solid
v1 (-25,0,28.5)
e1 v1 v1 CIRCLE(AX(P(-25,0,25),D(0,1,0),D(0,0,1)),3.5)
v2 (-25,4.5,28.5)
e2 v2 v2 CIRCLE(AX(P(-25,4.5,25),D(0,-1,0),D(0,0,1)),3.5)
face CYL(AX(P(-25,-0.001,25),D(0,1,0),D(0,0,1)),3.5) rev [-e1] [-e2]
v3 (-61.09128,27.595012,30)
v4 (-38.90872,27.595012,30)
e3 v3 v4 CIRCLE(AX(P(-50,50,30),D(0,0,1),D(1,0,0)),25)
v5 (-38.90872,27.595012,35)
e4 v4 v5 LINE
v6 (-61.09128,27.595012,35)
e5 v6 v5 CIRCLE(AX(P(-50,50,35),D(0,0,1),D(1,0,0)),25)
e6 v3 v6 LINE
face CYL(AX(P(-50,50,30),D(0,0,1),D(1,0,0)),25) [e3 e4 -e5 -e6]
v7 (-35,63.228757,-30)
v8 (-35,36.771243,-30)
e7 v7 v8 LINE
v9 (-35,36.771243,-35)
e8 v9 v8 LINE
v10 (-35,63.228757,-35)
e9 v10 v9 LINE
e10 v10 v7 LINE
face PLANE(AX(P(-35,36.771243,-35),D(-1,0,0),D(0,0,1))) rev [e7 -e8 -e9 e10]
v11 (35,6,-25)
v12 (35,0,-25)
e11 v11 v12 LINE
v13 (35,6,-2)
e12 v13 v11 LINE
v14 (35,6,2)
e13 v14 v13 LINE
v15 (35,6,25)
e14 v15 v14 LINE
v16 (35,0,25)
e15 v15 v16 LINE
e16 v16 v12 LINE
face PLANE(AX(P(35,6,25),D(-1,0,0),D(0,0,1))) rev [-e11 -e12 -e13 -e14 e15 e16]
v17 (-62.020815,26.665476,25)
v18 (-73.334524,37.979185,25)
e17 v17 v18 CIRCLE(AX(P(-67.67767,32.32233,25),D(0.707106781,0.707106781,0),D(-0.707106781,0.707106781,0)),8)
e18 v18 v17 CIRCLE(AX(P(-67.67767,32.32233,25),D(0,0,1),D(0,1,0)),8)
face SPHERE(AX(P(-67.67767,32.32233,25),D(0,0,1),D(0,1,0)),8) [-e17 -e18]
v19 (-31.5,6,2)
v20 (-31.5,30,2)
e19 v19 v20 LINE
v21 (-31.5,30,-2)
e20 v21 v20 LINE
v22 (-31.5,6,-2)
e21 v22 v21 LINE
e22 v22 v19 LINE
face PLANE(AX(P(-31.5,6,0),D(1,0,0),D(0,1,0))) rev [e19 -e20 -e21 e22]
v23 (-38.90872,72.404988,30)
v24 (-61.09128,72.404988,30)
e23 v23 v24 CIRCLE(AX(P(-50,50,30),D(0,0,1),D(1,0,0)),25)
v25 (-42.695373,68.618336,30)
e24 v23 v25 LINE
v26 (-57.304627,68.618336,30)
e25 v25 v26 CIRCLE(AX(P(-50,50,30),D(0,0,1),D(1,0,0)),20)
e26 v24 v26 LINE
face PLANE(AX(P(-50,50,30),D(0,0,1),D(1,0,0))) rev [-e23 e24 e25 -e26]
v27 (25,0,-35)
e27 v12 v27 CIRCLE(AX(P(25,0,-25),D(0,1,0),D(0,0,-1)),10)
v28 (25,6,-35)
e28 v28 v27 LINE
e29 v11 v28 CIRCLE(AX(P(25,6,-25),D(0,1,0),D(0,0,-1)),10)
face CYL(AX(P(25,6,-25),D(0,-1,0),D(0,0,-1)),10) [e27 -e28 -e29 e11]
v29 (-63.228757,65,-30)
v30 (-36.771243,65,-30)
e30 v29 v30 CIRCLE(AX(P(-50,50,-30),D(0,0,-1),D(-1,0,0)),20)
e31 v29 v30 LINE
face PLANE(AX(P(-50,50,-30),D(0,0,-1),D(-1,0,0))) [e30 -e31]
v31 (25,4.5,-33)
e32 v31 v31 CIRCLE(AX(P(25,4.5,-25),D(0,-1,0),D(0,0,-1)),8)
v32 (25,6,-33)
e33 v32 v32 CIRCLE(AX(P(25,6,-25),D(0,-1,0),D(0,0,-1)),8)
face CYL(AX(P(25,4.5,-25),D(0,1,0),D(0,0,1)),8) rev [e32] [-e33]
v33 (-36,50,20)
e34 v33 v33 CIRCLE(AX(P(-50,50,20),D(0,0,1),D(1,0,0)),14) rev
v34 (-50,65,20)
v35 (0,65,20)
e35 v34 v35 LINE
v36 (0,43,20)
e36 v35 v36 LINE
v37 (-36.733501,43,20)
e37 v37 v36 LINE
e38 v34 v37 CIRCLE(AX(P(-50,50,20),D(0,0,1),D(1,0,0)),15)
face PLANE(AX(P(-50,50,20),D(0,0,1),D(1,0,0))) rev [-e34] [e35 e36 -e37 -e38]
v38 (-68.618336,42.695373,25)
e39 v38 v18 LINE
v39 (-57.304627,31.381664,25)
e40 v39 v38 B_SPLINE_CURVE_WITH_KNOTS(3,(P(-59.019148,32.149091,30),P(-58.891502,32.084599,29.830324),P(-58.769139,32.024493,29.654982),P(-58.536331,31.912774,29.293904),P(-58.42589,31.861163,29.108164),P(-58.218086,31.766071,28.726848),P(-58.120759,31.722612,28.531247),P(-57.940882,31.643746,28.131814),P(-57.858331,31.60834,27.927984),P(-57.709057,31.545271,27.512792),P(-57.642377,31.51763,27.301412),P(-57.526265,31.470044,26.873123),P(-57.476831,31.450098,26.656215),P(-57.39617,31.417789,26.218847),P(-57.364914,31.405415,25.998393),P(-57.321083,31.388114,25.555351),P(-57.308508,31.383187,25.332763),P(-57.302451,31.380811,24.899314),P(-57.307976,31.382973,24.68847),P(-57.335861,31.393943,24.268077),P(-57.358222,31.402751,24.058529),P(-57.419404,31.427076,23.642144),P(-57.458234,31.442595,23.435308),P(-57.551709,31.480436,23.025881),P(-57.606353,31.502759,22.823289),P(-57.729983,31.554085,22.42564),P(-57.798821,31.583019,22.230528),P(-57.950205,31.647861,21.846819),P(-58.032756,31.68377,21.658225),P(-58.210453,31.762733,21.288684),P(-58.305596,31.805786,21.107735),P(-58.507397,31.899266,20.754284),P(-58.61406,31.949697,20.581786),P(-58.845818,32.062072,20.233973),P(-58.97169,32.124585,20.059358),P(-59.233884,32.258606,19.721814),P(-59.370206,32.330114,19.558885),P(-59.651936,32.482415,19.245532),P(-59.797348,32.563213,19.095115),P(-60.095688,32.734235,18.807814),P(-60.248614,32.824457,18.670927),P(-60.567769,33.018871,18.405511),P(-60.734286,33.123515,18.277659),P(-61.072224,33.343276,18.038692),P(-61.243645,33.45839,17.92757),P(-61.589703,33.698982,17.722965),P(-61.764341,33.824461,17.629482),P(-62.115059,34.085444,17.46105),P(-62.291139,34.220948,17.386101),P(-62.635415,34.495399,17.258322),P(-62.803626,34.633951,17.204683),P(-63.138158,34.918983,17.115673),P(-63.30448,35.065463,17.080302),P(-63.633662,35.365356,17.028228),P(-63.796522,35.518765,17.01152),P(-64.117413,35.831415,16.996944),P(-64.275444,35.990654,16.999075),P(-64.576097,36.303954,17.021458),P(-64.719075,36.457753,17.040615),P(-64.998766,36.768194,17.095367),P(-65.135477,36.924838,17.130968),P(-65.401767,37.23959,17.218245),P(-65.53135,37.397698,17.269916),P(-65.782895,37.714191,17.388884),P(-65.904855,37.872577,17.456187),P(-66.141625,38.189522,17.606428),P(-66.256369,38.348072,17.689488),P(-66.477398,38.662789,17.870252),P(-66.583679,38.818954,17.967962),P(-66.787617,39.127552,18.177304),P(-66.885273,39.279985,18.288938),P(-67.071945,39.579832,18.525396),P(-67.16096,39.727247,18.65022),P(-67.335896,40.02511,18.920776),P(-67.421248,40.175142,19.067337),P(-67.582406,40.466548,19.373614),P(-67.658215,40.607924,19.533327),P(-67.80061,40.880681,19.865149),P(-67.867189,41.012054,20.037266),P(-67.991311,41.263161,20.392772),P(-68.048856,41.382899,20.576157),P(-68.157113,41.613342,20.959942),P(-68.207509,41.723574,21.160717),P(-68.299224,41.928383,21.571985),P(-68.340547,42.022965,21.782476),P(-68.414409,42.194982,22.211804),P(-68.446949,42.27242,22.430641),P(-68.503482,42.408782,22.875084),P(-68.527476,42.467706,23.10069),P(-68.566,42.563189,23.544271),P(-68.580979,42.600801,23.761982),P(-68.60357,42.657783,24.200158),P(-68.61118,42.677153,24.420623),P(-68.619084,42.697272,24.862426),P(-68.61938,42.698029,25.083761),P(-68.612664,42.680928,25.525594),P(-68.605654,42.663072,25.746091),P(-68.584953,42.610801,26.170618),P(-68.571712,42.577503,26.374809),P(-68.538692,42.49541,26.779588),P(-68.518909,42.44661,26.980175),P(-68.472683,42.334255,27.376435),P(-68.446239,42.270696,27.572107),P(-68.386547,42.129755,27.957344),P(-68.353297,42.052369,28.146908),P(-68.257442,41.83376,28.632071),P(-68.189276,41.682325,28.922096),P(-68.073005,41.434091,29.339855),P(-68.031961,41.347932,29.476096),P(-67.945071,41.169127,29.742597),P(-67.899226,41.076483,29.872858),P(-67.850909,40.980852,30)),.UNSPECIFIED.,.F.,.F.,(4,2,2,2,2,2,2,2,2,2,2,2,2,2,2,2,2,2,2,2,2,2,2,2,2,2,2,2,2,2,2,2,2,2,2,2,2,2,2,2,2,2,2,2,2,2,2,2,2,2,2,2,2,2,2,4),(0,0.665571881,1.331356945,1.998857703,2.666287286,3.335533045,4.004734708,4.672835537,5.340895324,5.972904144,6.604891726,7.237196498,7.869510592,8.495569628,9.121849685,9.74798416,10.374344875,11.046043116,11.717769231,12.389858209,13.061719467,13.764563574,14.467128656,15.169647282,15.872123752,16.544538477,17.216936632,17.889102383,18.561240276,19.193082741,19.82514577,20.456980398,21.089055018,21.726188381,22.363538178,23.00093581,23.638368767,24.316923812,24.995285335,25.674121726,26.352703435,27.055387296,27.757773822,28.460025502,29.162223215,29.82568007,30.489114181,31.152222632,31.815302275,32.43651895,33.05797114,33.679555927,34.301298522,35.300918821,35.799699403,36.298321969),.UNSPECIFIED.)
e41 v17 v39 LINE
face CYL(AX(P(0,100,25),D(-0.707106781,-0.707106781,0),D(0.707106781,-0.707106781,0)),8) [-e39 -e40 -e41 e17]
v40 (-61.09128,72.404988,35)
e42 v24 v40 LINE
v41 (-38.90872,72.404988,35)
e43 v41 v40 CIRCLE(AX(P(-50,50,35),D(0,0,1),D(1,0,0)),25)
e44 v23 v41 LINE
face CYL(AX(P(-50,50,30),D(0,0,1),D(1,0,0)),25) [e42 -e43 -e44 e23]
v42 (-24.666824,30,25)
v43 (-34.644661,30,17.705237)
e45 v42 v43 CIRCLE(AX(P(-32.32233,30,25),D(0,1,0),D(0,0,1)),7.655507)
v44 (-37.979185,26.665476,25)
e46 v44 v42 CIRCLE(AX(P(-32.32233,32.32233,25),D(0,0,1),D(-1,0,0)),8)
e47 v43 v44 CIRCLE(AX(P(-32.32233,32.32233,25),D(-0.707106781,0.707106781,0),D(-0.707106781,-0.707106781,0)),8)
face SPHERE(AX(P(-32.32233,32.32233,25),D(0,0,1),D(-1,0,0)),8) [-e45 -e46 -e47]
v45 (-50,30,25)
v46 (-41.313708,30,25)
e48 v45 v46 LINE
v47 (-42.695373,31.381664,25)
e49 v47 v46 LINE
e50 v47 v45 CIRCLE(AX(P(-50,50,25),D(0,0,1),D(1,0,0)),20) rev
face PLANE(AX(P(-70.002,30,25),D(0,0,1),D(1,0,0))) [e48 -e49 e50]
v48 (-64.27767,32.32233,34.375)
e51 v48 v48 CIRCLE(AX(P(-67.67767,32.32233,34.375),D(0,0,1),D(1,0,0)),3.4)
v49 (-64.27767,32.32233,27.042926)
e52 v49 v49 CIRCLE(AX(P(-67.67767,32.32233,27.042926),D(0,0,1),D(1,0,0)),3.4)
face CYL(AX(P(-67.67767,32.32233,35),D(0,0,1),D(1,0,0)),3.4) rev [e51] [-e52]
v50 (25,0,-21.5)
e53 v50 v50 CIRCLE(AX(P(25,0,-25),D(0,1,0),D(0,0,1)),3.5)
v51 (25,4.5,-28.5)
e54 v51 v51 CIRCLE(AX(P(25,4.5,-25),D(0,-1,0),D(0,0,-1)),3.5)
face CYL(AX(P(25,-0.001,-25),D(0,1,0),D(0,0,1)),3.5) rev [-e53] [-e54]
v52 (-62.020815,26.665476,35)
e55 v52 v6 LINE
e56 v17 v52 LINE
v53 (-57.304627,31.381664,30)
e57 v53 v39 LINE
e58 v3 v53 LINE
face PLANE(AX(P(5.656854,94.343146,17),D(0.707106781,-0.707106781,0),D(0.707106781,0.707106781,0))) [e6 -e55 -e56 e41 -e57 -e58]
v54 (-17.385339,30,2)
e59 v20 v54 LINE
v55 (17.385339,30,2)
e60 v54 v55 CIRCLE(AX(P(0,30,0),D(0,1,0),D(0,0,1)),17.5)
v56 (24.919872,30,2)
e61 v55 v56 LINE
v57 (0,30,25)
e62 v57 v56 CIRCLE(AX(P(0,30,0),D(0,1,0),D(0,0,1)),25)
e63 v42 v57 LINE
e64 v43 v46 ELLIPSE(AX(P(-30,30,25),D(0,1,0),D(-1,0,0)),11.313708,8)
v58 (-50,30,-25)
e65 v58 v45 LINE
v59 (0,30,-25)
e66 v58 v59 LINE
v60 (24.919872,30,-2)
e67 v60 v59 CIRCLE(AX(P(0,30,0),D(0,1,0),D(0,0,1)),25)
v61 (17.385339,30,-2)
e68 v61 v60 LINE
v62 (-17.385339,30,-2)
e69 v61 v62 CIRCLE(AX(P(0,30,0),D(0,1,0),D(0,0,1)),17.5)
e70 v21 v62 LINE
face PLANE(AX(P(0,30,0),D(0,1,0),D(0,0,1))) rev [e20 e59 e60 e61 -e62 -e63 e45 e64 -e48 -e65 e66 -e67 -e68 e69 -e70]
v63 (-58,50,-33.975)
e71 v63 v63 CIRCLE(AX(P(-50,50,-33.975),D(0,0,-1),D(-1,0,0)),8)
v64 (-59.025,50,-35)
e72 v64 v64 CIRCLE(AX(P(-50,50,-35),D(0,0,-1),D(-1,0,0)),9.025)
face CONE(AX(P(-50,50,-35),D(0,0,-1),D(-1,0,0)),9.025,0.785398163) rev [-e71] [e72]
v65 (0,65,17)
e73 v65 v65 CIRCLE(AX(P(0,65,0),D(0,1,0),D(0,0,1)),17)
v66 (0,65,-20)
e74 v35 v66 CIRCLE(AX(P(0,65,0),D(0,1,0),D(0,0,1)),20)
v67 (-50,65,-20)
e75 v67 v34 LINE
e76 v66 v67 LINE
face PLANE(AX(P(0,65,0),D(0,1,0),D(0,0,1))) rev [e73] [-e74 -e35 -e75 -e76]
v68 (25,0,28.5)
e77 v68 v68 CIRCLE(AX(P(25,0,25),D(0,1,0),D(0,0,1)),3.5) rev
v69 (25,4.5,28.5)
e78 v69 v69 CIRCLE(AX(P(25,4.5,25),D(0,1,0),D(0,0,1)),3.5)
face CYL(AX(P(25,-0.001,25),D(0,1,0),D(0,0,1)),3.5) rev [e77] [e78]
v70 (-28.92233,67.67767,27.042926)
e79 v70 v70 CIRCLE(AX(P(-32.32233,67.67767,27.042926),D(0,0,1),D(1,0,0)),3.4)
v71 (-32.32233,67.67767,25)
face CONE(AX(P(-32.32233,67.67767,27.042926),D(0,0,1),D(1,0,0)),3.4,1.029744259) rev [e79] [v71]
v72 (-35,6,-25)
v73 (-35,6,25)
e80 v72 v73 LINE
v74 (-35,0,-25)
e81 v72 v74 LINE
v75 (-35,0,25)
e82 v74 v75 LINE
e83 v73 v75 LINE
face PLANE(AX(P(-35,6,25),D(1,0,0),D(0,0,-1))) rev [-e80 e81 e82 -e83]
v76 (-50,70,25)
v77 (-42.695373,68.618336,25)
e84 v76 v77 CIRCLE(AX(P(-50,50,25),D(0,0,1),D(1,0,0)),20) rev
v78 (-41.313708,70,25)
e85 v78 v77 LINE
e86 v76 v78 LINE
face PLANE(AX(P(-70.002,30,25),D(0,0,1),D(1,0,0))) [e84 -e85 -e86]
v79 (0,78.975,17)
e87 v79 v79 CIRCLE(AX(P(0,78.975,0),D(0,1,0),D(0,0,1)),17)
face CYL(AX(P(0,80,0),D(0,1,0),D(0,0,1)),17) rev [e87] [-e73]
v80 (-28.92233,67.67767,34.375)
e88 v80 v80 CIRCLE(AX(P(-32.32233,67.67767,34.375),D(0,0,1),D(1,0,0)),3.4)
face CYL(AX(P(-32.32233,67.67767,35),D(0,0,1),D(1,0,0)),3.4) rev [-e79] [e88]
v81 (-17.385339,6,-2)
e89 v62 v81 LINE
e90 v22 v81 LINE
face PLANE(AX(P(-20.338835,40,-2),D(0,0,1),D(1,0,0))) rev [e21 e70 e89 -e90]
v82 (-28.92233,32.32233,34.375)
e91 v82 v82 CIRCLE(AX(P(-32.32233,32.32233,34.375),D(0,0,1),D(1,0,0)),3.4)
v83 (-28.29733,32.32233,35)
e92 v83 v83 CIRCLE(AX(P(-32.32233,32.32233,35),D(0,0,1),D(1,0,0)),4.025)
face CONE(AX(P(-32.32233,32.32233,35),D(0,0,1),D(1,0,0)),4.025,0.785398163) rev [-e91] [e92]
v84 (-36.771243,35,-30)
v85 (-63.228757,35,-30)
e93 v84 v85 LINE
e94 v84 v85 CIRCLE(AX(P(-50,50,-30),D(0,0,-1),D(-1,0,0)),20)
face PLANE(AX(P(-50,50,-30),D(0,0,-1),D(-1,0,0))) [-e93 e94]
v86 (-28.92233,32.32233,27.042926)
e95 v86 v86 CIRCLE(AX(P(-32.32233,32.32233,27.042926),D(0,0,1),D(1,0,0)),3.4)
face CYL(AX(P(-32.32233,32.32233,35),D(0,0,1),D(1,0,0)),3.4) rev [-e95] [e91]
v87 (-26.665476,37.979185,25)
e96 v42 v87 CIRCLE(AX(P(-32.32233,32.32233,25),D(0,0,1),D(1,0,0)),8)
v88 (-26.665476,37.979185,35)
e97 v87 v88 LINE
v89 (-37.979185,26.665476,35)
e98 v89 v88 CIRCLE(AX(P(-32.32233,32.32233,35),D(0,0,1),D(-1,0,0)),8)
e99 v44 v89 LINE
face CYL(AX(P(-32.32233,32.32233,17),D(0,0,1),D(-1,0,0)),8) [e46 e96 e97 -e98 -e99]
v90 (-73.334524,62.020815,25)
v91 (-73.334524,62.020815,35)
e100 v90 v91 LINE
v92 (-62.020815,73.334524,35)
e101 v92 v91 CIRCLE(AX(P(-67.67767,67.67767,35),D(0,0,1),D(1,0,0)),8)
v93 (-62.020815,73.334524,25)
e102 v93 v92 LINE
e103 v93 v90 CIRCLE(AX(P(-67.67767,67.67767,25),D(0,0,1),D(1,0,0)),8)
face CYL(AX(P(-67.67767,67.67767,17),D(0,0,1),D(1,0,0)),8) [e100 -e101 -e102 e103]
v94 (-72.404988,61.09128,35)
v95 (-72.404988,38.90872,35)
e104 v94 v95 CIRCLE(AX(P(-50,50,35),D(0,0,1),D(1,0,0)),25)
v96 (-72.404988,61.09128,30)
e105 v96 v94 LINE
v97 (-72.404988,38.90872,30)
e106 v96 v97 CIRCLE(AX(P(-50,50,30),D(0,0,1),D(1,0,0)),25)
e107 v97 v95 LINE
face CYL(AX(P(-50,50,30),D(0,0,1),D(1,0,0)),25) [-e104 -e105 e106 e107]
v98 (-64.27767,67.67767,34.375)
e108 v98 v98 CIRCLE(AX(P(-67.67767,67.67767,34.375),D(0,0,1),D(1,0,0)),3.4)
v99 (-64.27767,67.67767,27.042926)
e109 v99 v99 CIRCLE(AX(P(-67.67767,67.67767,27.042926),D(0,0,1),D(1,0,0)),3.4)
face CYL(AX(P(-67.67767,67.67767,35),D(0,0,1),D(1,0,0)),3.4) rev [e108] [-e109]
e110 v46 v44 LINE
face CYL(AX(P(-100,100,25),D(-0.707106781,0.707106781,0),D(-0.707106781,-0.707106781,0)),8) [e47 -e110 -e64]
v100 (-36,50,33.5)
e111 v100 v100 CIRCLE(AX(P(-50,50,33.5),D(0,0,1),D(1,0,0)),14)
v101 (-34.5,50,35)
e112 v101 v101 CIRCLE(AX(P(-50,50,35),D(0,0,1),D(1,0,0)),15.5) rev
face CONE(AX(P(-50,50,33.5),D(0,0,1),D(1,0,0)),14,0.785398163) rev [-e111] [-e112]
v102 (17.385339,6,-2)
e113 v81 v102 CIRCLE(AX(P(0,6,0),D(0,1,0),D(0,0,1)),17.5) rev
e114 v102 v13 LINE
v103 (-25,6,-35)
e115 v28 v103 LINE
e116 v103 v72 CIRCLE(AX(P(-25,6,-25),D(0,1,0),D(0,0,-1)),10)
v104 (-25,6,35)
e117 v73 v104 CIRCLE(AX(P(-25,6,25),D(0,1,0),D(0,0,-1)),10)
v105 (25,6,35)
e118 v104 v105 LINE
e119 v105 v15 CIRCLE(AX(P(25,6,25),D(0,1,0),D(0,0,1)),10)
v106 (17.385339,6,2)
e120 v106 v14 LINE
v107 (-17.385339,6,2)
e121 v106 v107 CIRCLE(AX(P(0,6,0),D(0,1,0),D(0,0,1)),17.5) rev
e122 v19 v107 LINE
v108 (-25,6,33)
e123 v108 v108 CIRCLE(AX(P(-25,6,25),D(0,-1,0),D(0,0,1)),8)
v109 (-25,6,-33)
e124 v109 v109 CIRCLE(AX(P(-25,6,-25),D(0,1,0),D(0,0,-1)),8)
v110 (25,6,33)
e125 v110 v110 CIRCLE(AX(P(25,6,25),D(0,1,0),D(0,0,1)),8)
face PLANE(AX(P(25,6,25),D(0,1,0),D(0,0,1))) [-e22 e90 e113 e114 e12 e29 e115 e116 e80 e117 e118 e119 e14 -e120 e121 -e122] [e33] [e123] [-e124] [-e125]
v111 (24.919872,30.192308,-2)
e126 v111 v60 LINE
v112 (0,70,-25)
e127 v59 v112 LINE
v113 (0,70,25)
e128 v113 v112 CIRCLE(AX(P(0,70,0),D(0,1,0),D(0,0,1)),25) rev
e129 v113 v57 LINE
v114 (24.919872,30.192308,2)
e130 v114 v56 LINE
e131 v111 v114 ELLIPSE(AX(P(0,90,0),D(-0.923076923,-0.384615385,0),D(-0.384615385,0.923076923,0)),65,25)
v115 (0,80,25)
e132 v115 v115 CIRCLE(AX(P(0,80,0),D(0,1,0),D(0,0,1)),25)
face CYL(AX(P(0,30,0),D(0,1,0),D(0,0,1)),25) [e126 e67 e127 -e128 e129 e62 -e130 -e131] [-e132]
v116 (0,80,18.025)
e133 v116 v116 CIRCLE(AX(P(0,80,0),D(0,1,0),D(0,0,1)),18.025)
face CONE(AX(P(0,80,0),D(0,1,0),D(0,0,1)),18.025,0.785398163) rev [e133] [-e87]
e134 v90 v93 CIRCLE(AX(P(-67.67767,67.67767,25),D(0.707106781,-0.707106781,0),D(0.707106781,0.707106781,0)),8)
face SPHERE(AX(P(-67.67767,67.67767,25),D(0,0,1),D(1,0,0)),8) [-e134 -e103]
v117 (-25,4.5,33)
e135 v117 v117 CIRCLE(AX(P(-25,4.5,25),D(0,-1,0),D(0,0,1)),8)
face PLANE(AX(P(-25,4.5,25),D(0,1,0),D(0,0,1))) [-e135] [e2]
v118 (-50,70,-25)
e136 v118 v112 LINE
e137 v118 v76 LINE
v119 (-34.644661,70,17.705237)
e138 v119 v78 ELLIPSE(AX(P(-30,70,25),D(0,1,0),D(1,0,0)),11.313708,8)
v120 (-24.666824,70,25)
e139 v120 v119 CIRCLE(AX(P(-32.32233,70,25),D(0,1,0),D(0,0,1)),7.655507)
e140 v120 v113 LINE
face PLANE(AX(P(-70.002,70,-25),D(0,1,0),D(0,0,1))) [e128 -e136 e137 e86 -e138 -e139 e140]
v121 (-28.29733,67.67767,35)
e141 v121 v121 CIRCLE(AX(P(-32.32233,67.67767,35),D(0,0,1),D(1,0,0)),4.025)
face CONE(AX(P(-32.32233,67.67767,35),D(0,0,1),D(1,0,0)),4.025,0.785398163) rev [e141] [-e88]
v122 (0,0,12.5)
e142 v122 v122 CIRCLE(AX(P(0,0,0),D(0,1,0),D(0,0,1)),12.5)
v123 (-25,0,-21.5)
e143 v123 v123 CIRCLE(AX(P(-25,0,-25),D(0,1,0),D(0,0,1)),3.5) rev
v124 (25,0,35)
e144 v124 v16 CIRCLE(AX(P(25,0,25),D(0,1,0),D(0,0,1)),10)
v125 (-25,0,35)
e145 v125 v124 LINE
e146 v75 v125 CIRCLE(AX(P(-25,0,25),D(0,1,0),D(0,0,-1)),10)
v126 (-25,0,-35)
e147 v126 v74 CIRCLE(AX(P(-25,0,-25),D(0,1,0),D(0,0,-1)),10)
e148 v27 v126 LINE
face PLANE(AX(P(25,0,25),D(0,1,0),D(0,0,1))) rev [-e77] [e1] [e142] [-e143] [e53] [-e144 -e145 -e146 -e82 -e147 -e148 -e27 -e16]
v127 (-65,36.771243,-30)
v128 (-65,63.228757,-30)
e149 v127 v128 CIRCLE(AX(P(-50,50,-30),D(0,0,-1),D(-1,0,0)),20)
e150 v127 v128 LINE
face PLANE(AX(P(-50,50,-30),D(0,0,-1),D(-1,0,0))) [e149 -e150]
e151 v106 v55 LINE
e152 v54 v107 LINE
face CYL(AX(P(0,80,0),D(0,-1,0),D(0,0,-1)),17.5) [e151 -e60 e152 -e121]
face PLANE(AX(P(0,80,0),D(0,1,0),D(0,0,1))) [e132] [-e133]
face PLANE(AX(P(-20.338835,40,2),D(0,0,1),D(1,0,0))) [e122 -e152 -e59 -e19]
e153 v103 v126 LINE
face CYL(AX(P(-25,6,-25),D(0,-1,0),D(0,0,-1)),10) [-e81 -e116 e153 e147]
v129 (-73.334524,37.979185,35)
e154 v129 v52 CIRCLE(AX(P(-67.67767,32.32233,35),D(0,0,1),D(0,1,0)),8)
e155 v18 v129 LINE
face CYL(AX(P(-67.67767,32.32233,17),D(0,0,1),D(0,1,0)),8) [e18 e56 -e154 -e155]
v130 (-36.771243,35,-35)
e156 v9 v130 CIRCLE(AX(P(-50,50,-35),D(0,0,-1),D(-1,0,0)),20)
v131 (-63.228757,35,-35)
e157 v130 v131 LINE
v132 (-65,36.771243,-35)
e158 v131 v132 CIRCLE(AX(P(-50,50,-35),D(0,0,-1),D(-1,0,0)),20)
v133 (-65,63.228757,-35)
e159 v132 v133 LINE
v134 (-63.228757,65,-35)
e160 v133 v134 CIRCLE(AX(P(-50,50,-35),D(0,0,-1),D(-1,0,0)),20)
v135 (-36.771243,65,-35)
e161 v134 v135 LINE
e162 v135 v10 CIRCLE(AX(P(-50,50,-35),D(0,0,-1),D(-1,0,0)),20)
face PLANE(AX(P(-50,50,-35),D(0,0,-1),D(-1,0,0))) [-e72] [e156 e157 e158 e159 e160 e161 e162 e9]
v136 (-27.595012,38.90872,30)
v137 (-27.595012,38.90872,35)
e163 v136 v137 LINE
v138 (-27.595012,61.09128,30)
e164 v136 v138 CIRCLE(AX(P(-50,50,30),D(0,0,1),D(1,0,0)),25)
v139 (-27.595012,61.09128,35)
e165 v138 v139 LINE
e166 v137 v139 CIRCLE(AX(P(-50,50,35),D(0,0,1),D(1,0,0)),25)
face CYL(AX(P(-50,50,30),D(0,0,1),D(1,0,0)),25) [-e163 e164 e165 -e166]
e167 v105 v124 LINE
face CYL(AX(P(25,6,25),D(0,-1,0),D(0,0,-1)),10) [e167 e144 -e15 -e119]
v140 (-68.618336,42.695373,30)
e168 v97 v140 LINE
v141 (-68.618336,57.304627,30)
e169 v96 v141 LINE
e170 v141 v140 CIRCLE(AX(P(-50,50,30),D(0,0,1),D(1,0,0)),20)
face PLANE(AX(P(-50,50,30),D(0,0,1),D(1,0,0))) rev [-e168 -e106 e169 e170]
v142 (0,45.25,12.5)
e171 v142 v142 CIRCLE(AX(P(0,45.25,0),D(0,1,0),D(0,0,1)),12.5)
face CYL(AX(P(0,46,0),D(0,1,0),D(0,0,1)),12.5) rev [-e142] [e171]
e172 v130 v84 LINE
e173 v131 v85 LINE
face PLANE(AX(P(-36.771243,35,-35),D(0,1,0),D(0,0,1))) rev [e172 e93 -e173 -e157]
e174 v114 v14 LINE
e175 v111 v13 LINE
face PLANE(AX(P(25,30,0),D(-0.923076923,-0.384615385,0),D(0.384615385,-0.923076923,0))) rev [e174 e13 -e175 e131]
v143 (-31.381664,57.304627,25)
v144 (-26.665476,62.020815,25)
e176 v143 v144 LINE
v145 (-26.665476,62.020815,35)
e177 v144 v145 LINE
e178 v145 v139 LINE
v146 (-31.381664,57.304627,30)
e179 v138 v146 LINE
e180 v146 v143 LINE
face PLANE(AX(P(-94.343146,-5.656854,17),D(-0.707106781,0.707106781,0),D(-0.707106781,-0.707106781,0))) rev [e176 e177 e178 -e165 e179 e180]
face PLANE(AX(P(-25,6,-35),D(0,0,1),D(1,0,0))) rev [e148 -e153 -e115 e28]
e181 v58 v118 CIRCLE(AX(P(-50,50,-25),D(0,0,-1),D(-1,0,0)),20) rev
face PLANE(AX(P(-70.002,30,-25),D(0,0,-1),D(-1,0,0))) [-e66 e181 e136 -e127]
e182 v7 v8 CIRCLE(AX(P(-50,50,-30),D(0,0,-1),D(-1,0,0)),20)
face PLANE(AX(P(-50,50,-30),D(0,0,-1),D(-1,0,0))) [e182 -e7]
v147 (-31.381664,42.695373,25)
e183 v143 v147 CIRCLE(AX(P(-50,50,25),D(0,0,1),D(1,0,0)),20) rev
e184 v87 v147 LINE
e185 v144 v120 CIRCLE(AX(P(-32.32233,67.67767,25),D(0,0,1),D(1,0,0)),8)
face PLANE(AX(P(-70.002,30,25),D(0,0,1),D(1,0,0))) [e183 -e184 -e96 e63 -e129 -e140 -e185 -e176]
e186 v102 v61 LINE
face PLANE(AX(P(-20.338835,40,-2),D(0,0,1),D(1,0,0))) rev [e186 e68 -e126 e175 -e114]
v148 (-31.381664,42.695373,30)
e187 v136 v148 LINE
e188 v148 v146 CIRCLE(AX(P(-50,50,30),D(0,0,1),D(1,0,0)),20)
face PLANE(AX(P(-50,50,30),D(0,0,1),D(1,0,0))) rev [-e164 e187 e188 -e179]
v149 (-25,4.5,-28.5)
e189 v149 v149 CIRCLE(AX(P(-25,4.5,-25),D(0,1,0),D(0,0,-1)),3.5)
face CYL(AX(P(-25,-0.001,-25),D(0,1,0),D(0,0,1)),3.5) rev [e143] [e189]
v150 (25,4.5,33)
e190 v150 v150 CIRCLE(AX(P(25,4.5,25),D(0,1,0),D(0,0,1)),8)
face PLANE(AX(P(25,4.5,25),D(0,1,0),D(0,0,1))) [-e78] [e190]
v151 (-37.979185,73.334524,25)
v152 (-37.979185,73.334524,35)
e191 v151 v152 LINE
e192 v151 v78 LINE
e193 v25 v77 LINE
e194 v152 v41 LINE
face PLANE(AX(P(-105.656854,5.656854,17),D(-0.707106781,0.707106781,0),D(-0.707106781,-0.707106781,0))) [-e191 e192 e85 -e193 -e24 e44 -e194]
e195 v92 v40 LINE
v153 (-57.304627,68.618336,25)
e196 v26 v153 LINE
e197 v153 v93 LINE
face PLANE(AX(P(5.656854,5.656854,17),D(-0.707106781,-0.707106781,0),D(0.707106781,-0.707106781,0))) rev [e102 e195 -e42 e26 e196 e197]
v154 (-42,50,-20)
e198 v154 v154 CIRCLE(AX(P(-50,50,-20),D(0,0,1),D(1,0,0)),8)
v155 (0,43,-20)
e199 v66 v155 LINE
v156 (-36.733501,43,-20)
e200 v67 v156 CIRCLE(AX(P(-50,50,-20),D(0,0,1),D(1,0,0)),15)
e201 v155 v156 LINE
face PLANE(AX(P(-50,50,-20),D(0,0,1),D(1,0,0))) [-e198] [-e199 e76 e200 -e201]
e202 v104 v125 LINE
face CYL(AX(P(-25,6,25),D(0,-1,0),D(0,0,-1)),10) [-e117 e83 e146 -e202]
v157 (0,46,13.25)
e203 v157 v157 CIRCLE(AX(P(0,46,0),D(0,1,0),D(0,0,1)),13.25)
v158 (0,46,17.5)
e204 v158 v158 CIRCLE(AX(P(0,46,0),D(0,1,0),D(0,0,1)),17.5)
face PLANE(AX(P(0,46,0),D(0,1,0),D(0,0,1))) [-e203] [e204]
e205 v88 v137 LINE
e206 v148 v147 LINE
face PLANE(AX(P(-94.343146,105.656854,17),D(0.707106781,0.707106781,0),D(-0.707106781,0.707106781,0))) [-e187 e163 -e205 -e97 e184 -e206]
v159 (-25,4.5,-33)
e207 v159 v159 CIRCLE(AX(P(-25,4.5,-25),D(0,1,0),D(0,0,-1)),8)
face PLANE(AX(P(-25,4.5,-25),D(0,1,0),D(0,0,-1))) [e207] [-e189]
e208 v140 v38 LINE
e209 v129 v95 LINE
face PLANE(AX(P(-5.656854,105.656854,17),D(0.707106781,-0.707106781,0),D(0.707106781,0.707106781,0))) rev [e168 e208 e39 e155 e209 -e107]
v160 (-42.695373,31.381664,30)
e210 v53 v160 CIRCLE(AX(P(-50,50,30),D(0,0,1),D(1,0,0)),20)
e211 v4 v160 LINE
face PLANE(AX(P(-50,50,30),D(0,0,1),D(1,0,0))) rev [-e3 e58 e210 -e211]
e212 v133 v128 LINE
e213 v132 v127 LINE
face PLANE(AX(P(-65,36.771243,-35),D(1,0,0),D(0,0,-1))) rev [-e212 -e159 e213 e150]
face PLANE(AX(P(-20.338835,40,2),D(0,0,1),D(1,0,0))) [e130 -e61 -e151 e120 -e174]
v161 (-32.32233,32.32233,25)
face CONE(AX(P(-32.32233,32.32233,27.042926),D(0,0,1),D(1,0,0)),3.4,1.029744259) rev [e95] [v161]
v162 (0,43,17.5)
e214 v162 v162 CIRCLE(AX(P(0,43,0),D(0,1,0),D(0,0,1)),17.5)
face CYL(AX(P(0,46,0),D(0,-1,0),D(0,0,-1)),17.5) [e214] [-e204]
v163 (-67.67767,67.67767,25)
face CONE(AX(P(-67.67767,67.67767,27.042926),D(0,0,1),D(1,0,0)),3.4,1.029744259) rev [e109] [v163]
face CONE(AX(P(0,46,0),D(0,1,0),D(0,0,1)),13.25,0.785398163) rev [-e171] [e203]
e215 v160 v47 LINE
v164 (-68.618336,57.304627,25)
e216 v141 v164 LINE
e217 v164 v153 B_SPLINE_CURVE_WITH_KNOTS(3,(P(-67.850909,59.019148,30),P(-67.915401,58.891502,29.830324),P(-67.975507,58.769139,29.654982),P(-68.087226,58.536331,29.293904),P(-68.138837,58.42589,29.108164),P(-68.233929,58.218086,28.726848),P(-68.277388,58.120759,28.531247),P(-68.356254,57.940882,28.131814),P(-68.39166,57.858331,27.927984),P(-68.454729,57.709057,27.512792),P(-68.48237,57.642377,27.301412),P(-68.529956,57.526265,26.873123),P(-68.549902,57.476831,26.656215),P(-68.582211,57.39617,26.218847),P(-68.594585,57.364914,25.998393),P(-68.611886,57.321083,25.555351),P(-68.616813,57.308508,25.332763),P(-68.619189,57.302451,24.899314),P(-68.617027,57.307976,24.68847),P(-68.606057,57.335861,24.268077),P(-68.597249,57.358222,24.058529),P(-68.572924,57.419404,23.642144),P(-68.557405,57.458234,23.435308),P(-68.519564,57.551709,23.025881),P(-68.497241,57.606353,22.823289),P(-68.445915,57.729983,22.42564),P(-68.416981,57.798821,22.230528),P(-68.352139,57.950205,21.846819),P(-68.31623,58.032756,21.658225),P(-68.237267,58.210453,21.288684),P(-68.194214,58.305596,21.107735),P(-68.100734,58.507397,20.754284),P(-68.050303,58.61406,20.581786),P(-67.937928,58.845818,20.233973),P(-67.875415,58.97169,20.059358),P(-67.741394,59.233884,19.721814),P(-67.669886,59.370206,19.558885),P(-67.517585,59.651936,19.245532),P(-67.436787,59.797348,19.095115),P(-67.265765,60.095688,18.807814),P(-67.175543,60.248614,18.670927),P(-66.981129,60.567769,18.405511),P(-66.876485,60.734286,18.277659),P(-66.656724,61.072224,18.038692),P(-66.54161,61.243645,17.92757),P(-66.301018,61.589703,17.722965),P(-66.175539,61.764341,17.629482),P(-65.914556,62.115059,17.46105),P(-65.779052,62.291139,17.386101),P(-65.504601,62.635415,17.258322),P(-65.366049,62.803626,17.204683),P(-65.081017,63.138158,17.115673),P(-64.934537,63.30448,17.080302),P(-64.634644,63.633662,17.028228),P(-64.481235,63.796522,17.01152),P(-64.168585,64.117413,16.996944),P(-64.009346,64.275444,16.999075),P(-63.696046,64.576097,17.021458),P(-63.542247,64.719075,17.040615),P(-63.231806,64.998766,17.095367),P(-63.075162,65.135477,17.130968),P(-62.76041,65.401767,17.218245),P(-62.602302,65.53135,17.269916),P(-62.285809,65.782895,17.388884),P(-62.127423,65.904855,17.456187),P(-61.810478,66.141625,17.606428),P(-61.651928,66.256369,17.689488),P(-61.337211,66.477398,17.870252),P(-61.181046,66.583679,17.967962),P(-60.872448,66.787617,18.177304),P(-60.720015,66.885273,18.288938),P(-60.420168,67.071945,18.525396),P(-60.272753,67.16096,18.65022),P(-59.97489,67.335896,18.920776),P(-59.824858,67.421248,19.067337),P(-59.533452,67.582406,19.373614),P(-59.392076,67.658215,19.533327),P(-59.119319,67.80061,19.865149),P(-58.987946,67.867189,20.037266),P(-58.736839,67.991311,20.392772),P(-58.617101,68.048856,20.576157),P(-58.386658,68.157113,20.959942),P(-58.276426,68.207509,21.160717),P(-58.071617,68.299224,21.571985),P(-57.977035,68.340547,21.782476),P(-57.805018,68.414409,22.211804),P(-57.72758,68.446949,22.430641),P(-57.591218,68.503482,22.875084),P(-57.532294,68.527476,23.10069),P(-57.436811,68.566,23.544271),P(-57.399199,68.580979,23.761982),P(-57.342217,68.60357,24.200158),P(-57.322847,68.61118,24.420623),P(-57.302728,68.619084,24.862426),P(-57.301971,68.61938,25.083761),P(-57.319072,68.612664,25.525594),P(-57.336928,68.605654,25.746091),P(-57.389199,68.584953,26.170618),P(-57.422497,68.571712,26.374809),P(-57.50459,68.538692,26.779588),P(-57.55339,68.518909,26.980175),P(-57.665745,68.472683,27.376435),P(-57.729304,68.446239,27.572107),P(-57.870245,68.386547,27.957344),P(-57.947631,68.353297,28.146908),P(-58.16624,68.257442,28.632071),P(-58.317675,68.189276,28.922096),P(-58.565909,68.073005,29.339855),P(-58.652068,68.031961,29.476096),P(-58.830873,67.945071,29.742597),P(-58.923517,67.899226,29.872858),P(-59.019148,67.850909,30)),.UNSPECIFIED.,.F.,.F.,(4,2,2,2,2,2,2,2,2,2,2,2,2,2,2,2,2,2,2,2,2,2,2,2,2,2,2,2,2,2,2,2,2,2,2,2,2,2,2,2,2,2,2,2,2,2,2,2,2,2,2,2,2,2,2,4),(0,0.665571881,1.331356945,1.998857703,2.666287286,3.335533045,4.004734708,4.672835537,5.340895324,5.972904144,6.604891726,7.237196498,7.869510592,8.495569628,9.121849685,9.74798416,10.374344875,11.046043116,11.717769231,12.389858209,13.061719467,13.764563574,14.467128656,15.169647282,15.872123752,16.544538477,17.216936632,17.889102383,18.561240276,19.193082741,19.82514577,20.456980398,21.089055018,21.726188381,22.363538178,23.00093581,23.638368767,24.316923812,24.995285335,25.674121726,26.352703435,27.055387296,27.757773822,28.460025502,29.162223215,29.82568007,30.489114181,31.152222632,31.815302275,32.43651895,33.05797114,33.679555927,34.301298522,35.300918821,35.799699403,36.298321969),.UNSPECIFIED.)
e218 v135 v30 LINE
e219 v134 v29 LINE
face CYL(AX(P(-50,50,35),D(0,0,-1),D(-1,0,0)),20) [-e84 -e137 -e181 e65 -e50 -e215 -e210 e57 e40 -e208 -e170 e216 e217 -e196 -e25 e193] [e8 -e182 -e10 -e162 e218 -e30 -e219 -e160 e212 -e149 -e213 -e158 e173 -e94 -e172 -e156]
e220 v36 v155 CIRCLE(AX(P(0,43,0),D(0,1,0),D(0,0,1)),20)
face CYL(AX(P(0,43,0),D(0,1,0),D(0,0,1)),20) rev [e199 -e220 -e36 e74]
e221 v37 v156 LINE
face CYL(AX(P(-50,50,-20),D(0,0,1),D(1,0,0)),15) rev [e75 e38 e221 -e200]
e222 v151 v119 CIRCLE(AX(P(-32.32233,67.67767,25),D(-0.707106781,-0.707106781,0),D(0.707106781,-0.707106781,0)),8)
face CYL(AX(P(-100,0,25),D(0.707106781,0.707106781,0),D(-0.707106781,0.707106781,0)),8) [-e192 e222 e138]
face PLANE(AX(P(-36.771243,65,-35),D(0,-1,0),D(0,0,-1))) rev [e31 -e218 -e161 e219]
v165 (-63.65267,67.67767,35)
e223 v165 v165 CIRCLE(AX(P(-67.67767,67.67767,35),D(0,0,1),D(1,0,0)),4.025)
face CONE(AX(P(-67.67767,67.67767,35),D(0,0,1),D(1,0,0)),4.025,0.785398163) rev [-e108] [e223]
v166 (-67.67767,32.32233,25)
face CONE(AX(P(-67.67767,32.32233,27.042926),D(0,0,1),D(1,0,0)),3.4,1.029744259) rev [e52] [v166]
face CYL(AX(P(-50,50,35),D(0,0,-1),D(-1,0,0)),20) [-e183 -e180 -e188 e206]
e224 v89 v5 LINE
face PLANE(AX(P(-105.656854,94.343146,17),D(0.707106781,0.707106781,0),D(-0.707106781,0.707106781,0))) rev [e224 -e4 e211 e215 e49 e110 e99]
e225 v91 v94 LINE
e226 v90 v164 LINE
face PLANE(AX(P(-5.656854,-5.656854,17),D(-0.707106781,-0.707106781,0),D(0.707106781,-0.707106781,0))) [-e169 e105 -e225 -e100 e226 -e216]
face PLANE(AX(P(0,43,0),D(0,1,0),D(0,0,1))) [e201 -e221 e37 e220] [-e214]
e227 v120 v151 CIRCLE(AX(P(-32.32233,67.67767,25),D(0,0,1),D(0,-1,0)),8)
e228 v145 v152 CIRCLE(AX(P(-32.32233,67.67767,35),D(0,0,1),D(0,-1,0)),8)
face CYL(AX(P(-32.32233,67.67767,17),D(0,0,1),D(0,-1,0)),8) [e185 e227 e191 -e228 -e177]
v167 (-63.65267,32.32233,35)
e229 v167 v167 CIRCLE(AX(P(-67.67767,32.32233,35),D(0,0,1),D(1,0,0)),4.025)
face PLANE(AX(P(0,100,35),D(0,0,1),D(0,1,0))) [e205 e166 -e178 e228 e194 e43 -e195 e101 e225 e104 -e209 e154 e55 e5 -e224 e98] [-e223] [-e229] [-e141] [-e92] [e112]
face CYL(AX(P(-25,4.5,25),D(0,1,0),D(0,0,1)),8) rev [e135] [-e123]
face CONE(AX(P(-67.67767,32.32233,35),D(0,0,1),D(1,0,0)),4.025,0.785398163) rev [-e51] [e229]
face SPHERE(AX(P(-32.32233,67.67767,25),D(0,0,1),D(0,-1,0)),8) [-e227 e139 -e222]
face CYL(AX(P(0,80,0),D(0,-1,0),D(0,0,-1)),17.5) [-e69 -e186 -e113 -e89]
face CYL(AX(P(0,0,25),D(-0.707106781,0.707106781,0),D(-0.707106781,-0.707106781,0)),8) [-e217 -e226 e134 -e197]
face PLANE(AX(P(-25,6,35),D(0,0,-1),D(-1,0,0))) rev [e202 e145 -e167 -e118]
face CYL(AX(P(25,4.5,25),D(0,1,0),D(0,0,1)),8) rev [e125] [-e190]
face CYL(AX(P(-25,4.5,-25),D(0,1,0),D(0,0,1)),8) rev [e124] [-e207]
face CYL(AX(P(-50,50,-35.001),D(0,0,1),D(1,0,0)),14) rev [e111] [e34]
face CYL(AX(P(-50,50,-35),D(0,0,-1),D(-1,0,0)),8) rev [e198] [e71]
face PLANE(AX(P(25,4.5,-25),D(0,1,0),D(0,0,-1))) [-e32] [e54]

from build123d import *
from build123d.topology import SkipClean

# Parameters (mm, degrees)
EXTRUDE_1_DEPTH                            = 6
EXTRUDE_START                              = -6
SKETCH_2_R                                 = 17.5
EXTRUDE_2_DEPTH                            = 80
SKETCH_3_R                                 = 25
EXTRUDE_3_DEPTH                            = 50
SKETCH_5_R                                 = 20
EXTRUDE_4_DEPTH                            = 35
EXTRUDE_5_REACH                            = 113.915
EXTRUDE_5_END_RADIUS                       = 20
SKETCH_4_W                                 = 50
SKETCH_4_H                                 = 40
SKETCH_9_R                                 = 25
EXTRUDE_9_DEPTH                            = 5
EXTRUDE_8_DEPTH                            = 18
FILLET_1_R                                 = 8
PATTERN_CIRCULAR_7_COUNT                   = 4
CUT_EXTRUDE_START                          = -5
SKETCH_10_R                                = 20
CUT_EXTRUDE_2_DEPTH                        = 5
EXTRUDE_10_DEPTH                           = 5
RIB_1_REACH                                = 117.551
SKETCH_11_WALL_W                           = 259.102658406
SKETCH_11_WALL_H                           = 4
RIB_2_REACH                                = 117.551
SKETCH_12_WALL_W                           = 257.102658406
SKETCH_12_WALL_H                           = 4
SKETCH_13_R                                = 15
CUT_EXTRUDE_3_DEPTH                        = 20
CUT_EXTRUDE_START_2                        = -15
SKETCH_14_R                                = 20
CUT_EXTRUDE_4_DEPTH                        = 22
SKETCH_15_W                                = 50
SKETCH_15_H                                = 40
CUT_EXTRUDE_5_DEPTH                        = 22
SKETCH_16_R                                = 17.5
EXTRUDE_11_DEPTH                           = 3
F_25_0MM_1_D                               = 25
F_25_0MM_1_CSINK_D                         = 26.5
F_25_0MM_1_CSINK_ANGLE                     = 90
HOLE_WIZARD_M8_1_D                         = 6.8
HOLE_WIZARD_M8_1_DEPTH                     = 7.957073895
HOLE_WIZARD_M8_1_CSINK_D                   = 8.05
HOLE_WIZARD_M8_1_CSINK_ANGLE               = 90
HOLE_WIZARD_M8_1_TIP                       = 2.042926105
CUT_EXTRUDE_6_REACH                        = 132.488
SKETCH_23_R                                = 14
CHAMFER_1_SIZE                             = 1.5
M18X2_0_1_D                                = 16
M18X2_0_1_CSINK_D                          = 18.05
M18X2_0_1_CSINK_ANGLE                      = 90
SKETCH_27_R                                = 8
CUT_EXTRUDE_7_DEPTH                        = 1.5
CUT_EXTRUDE_8_REACH                        = 114.483
SKETCH_28_R                                = 3.5
MIRROR_1_AT_THE_SECOND_PLANE_COPY_1_SKET_R = 8
MIRROR_1_AT_THE_SECOND_PLANE_COPY_1_DEPTH  = 1.5
MIRROR_1_AT_THE_SECOND_PLANE_COPY_2_REACH  = 114.483
MIRROR_1_AT_THE_SECOND_PLANE_COPY_2_SKET_R = 3.5


with BuildPart() as part:
    # 草图1 → 凸台-拉伸1 (new body)
    with BuildSketch(Plane(origin=(0, 0, 0), x_dir=(1, 0, 0), z_dir=(0, 1, 0))):
        with BuildLine():
            Line((-25, -35), (25, -35))
            ThreePointArc((25, -35), (32.071067812, -32.071067812), (35, -25))
            Line((35, -25), (35, 25))
            ThreePointArc((35, 25), (32.071067812, 32.071067812), (25, 35))
            Line((25, 35), (-25, 35))
            ThreePointArc((-25, 35), (-32.071067812, 32.071067812), (-35, 25))
            Line((-35, 25), (-35, -25))
            ThreePointArc((-35, -25), (-32.071067812, -32.071067812), (-25, -35))
        make_face()
    extrude(amount=EXTRUDE_1_DEPTH)

    # 草图2 → 凸台-拉伸2 (add)
    with BuildSketch(Plane(origin=(0, 6, 0), x_dir=(1, 0, 0), z_dir=(0, 1, 0)).offset(EXTRUDE_START)):
        with Locations(Location((0, 0, 0), (0, 0, 270))):
            Circle(SKETCH_2_R)
    extrude(amount=EXTRUDE_2_DEPTH)

    # 草图3 → 凸台-拉伸3 (add)
    with BuildSketch(Plane(origin=(0, 80, 0), x_dir=(1, 0, 0), z_dir=(0, 1, 0))):
        with Locations(Location((0, 0, 0), (0, 0, 270))):
            Circle(SKETCH_3_R)
    extrude(amount=-EXTRUDE_3_DEPTH)



with BuildPart() as body_2:
    # 草图5 → 凸台-拉伸4 (new, symmetric)
    with BuildSketch(Plane.XY):
        with Locations((-50, 50)):
            Circle(SKETCH_5_R)
    extrude(amount=EXTRUDE_4_DEPTH, both=True)


with BuildPart() as part_1:
    add(part.part)

    add(body_2.part)  # 凸台-拉伸5 merges body 2
    # 凸台-拉伸5: up to this cylinder (the profile starts outside it)
    extrude_5_end = Plane(origin=(-50, 50, 0), z_dir=(0, 0, -1)) * Cylinder(EXTRUDE_5_END_RADIUS, 268.83, mode=Mode.PRIVATE)
    # 草图4 → 凸台-拉伸5 (add, up to the surface)
    with BuildSketch(Plane(origin=(0, 0, 0), x_dir=(0, 0, -1), z_dir=(1, 0, 0)), mode=Mode.PRIVATE) as extrude_5_sk1:
        with Locations((0, 50)):
            Rectangle(SKETCH_4_W, SKETCH_4_H)
    extrude_5_tool1 = extrude(extrude_5_sk1.sketch, amount=-EXTRUDE_5_REACH, mode=Mode.PRIVATE) - extrude_5_end
    add(extrude_5_tool1.solids().sort_by_distance((0, 50, 0))[0])

    # 草图9 → 凸台-拉伸9 (add)
    with BuildSketch(Plane.XY.offset(35)):
        with Locations((-50, 50)):
            Circle(SKETCH_9_R)
    extrude(amount=-EXTRUDE_9_DEPTH)


with BuildPart() as body_2_2:
    # 草图6 → 凸台-拉伸8 (new body)
    with BuildSketch(Plane.XY.offset(35)):
        with BuildLine():
            Line((-62.02081528, 73.334523779), (-44.343145751, 55.656854249))
            Line((-44.343145751, 55.656854249), (-55.656854249, 44.343145751))
            Line((-55.656854249, 44.343145751), (-73.334523779, 62.02081528))
            ThreePointArc((-73.334523779, 62.02081528), (-73.334523779, 73.334523779), (-62.02081528, 73.334523779))
        make_face()
    extrude(amount=-EXTRUDE_8_DEPTH)

    # 圆角1
    fillet_1_edges = [body_2_2.edges().sort_by_distance(p)[0] for p in [
        (-64.495689014, 53.181980515, 17),
        (-73.334523779, 73.334523779, 17),
        (-53.181980515, 64.495689014, 17),
    ]]
    fillet(fillet_1_edges, radius=FILLET_1_R - 0.0001)  # a hair under: the kernel refuses the full size


with BuildPart() as pattern_circular_7_1:
    # 阵列(圆周)7: pattern copy
    add(body_2_2.part.rotate(Axis((-50, 50, 0), (0, 0, 1)), 1 * 360 / PATTERN_CIRCULAR_7_COUNT))


with BuildPart() as pattern_circular_7_2:
    # 阵列(圆周)7: pattern copy
    add(body_2_2.part.rotate(Axis((-50, 50, 0), (0, 0, 1)), 2 * 360 / PATTERN_CIRCULAR_7_COUNT))


with BuildPart() as pattern_circular_7_3:
    # 阵列(圆周)7: pattern copy
    add(body_2_2.part.rotate(Axis((-50, 50, 0), (0, 0, 1)), 3 * 360 / PATTERN_CIRCULAR_7_COUNT))


with BuildPart() as part_2:
    add(part_1.part)

    # 相交1: read off the stored shape, not the designer's step
    # 相交1: union 阵列(圆周)7_3, 阵列(圆周)7_2, 阵列(圆周)7_1, body 2 2
    add(pattern_circular_7_3.part)
    add(pattern_circular_7_2.part)
    add(pattern_circular_7_1.part)
    add(body_2_2.part)

    # 草图10 → 切除-拉伸2 (cut)
    with BuildSketch(Plane(origin=(0, 0, -35), x_dir=(-1, 0, 0), z_dir=(0, 0, -1)).offset(CUT_EXTRUDE_START)):
        with Locations((50, 50)):
            Circle(SKETCH_10_R)
    extrude(amount=CUT_EXTRUDE_2_DEPTH, mode=Mode.SUBTRACT)

    # 草图7 → 凸台-拉伸10 (add)
    with SkipClean():  # the faces are left unmerged after this step: merging them gives an invalid solid
        with BuildSketch(Plane(origin=(0, 0, -30), x_dir=(-1, 0, 0), z_dir=(0, 0, -1))):
            with BuildLine():
                Line((36.771243445, 35), (63.228756555, 35))
                ThreePointArc((63.228756555, 35), (64.142135624, 35.857864376), (65, 36.771243445))
                Line((65, 36.771243445), (65, 63.228756555))
                ThreePointArc((65, 63.228756555), (64.142135624, 64.142135624), (63.228756555, 65))
                Line((63.228756555, 65), (36.771243445, 65))
                ThreePointArc((36.771243445, 65), (35.857864376, 64.142135624), (35, 63.228756555))
                Line((35, 63.228756555), (35, 36.771243445))
                ThreePointArc((35, 36.771243445), (35.857864376, 35.857864376), (36.771243445, 35))
            make_face()
        extrude(amount=EXTRUDE_10_DEPTH)

    # 草图11 wall → 筋1 (add, up to next)
    with BuildSketch(Plane(origin=(30, 18, 0), x_dir=(0.384615384615, -0.923076923077, 0), z_dir=(0.923076923077, 0.384615384615, 0)), mode=Mode.PRIVATE) as rib_1_sk1:
        Rectangle(SKETCH_11_WALL_W, SKETCH_11_WALL_H)
    rib_1_tool1 = extrude(rib_1_sk1.sketch, amount=-RIB_1_REACH, mode=Mode.PRIVATE) - part_2.part
    add(rib_1_tool1.solids().sort_by_distance((30, 18, 0))[0])

    # 草图12 wall → 筋2 (add, up to next)
    with BuildSketch(Plane(origin=(-31.5, 18, 0), x_dir=(0, 1, 0), z_dir=(-1, 0, 0)), mode=Mode.PRIVATE) as rib_2_sk1:
        Rectangle(SKETCH_12_WALL_W, SKETCH_12_WALL_H)
    rib_2_tool1 = extrude(rib_2_sk1.sketch, amount=-RIB_2_REACH, mode=Mode.PRIVATE) - part_2.part
    add(rib_2_tool1.solids().sort_by_distance((-31.5, 18, 0))[0])

    # 草图13 → 切除-拉伸3 (cut, symmetric)
    with SkipClean():  # the faces are left unmerged after this step: merging them gives an invalid solid
        with BuildSketch(Plane.XY):
            with Locations((-50, 50)):
                Circle(SKETCH_13_R)
        extrude(amount=CUT_EXTRUDE_3_DEPTH, both=True, mode=Mode.SUBTRACT)

    # 草图14 → 切除-拉伸4 (cut)
    with SkipClean():  # the faces are left unmerged after this step: merging them gives an invalid solid
        with BuildSketch(Plane(origin=(0, 80, 0), x_dir=(1, 0, 0), z_dir=(0, 1, 0)).offset(CUT_EXTRUDE_START_2)):
            with Locations(Location((0, 0, 0), (0, 0, 270))):
                Circle(SKETCH_14_R)
        extrude(amount=-CUT_EXTRUDE_4_DEPTH, mode=Mode.SUBTRACT)

    # 草图15 → 切除-拉伸5 (cut)
    with SkipClean():  # the faces are left unmerged after this step: merging them gives an invalid solid
        with BuildSketch(Plane(origin=(0, 43, 0), x_dir=(1, 0, 0), z_dir=(0, 1, 0))):
            with Locations((-25, 0)):
                Rectangle(SKETCH_15_W, SKETCH_15_H)
        extrude(amount=CUT_EXTRUDE_5_DEPTH, mode=Mode.SUBTRACT)

    # 草图16 → 凸台-拉伸11 (add)
    with SkipClean():  # the faces are left unmerged after this step: merging them gives an invalid solid
        with BuildSketch(Plane(origin=(0, 43, 0), x_dir=(1, 0, 0), z_dir=(0, 1, 0))):
            with Locations(Location((0, 0, 0), (0, 0, 270))):
                Circle(SKETCH_16_R)
        extrude(amount=EXTRUDE_11_DEPTH)

    # 草图18 → M36x2.0 螺纹孔1 (revolve, cut)
    with SkipClean():  # the faces are left unmerged after this step: merging them gives an invalid solid
        with BuildSketch(Plane(origin=(0, 80, 0), x_dir=(0, 0, 1), z_dir=(1, 0, 0))):
            Polygon((0, 0), (0, 15), (17, 15), (17, 1.025), (18.025, 0), align=None)
        revolve(axis=Axis((0, 86.35, 0), (0, -1, 0)), mode=Mode.SUBTRACT)

    # Ø25.0mm 暗销孔1 (through all)
    with Locations(Plane(origin=(0, 46, 0), x_dir=(1, 0, 0), z_dir=(0, 1, 0))):
        with Locations((0, 0)):
            CounterSinkHole(F_25_0MM_1_D / 2, F_25_0MM_1_CSINK_D / 2, counter_sink_angle=F_25_0MM_1_CSINK_ANGLE)

    # M8 螺纹孔1
    with Locations(Plane.XY.offset(35)):
        with Locations((-32.32233047, 32.32233047), (-67.67766953, 32.32233047), (-67.67766953, 67.67766953), (-32.32233047, 67.67766953)):
            CounterSinkHole(HOLE_WIZARD_M8_1_D / 2, HOLE_WIZARD_M8_1_CSINK_D / 2, depth=HOLE_WIZARD_M8_1_DEPTH, counter_sink_angle=HOLE_WIZARD_M8_1_CSINK_ANGLE)
            with Locations((0, 0, -(HOLE_WIZARD_M8_1_DEPTH + HOLE_WIZARD_M8_1_TIP / 2))):  # 118° drill point
                Cone(0, HOLE_WIZARD_M8_1_D / 2, HOLE_WIZARD_M8_1_TIP, mode=Mode.SUBTRACT)

    # 草图23 → 切除-拉伸6 (cut, up to next)
    with BuildSketch(Plane.XY.offset(35), mode=Mode.PRIVATE) as cut_extrude_6_sk1:
        with Locations((-50, 50)):
            Circle(SKETCH_23_R)
    cut_extrude_6_tool1 = extrude(cut_extrude_6_sk1.sketch, amount=-CUT_EXTRUDE_6_REACH, mode=Mode.PRIVATE) & part_2.part
    add(cut_extrude_6_tool1.solids().sort_by_distance((-50, 50, 35))[0], mode=Mode.SUBTRACT)

    # 倒角1
    chamfer_1_edges = [part_2.edges().sort_by_distance(p)[0] for p in [
        (-64, 50, 35),
    ]]
    chamfer(chamfer_1_edges, length=CHAMFER_1_SIZE)

    # M18x2.0 螺纹孔1 (through all)
    with Locations(Plane(origin=(0, 0, -35), x_dir=(-1, 0, 0), z_dir=(0, 0, -1))):
        with Locations((50, 50)):
            CounterSinkHole(M18X2_0_1_D / 2, M18X2_0_1_CSINK_D / 2, counter_sink_angle=M18X2_0_1_CSINK_ANGLE)

    # 草图27 → 切除-拉伸7 (cut)
    with SkipClean():  # the faces are left unmerged after this step: merging them gives an invalid solid
        with BuildSketch(Plane(origin=(0, 6, 0), x_dir=(1, 0, 0), z_dir=(0, 1, 0))):
            with Locations(Location((25, -25, 0), (0, 0, 270))):
                Circle(SKETCH_27_R)
        cut_extrude_7 = extrude(amount=-CUT_EXTRUDE_7_DEPTH, mode=Mode.SUBTRACT)

    # 草图28 → 切除-拉伸8 (cut, up to next)
    with BuildSketch(Plane(origin=(0, 4.5, 0), x_dir=(1, 0, 0), z_dir=(0, 1, 0)), mode=Mode.PRIVATE) as cut_extrude_8_sk1:
        with Locations(Location((25, -25, 0), (0, 0, 270))):
            Circle(SKETCH_28_R)
    cut_extrude_8_tool1 = extrude(cut_extrude_8_sk1.sketch, amount=-CUT_EXTRUDE_8_REACH, mode=Mode.PRIVATE) & part_2.part
    cut_extrude_8 = cut_extrude_8_tool1.solids().sort_by_distance((25, 4.5, 25))[0]
    add(cut_extrude_8, mode=Mode.SUBTRACT)

    # 镜向1: 切除-拉伸7, 切除-拉伸8 across plane
    with SkipClean():  # the faces are left unmerged after this step: merging them gives an invalid solid
        add(cut_extrude_7.mirror(Plane(origin=(0, 0, 0), x_dir=(0, 0, 1), z_dir=(1, 0, 0))), mode=Mode.SUBTRACT)
        add(cut_extrude_8.mirror(Plane(origin=(0, 0, 0), x_dir=(0, 0, 1), z_dir=(1, 0, 0))), mode=Mode.SUBTRACT)

    # 镜向1 at the second plane: 切除-拉伸7, 切除-拉伸8 across plane
    with SkipClean():  # the faces are left unmerged after this step: merging them gives an invalid solid
        add(cut_extrude_7.mirror(Plane.XY), mode=Mode.SUBTRACT)
        add(cut_extrude_8.mirror(Plane.XY), mode=Mode.SUBTRACT)

    # 镜向1 at the second plane copy 1 sket → 镜向1 at the second plane copy 1 (cut)
    with SkipClean():  # the faces are left unmerged after this step: merging them gives an invalid solid
        with BuildSketch(Plane(origin=(0, 6, 0), x_dir=(-1, 0, 0), z_dir=(0, 1, 0))):
            with Locations(Location((25, -25, 0), (0, 0, 270))):
                Circle(MIRROR_1_AT_THE_SECOND_PLANE_COPY_1_SKET_R)
        extrude(amount=-MIRROR_1_AT_THE_SECOND_PLANE_COPY_1_DEPTH, mode=Mode.SUBTRACT)

    # 镜向1 at the second plane copy 2 sket → 镜向1 at the second plane copy 2 (cut, up to next)
    with BuildSketch(Plane(origin=(0, 4.5, 0), x_dir=(-1, 0, 0), z_dir=(0, 1, 0)), mode=Mode.PRIVATE) as mirror_1_at_the_second_plane_copy_2_sk1:
        with Locations(Location((25, -25, 0), (0, 0, 270))):
            Circle(MIRROR_1_AT_THE_SECOND_PLANE_COPY_2_SKET_R)
    mirror_1_at_the_second_plane_copy_2_tool1 = extrude(mirror_1_at_the_second_plane_copy_2_sk1.sketch, amount=-MIRROR_1_AT_THE_SECOND_PLANE_COPY_2_REACH, mode=Mode.PRIVATE) & part_2.part
    add(mirror_1_at_the_second_plane_copy_2_tool1.solids().sort_by_distance((-25, 4.5, -25))[0], mode=Mode.SUBTRACT)


solid = part_2.part
